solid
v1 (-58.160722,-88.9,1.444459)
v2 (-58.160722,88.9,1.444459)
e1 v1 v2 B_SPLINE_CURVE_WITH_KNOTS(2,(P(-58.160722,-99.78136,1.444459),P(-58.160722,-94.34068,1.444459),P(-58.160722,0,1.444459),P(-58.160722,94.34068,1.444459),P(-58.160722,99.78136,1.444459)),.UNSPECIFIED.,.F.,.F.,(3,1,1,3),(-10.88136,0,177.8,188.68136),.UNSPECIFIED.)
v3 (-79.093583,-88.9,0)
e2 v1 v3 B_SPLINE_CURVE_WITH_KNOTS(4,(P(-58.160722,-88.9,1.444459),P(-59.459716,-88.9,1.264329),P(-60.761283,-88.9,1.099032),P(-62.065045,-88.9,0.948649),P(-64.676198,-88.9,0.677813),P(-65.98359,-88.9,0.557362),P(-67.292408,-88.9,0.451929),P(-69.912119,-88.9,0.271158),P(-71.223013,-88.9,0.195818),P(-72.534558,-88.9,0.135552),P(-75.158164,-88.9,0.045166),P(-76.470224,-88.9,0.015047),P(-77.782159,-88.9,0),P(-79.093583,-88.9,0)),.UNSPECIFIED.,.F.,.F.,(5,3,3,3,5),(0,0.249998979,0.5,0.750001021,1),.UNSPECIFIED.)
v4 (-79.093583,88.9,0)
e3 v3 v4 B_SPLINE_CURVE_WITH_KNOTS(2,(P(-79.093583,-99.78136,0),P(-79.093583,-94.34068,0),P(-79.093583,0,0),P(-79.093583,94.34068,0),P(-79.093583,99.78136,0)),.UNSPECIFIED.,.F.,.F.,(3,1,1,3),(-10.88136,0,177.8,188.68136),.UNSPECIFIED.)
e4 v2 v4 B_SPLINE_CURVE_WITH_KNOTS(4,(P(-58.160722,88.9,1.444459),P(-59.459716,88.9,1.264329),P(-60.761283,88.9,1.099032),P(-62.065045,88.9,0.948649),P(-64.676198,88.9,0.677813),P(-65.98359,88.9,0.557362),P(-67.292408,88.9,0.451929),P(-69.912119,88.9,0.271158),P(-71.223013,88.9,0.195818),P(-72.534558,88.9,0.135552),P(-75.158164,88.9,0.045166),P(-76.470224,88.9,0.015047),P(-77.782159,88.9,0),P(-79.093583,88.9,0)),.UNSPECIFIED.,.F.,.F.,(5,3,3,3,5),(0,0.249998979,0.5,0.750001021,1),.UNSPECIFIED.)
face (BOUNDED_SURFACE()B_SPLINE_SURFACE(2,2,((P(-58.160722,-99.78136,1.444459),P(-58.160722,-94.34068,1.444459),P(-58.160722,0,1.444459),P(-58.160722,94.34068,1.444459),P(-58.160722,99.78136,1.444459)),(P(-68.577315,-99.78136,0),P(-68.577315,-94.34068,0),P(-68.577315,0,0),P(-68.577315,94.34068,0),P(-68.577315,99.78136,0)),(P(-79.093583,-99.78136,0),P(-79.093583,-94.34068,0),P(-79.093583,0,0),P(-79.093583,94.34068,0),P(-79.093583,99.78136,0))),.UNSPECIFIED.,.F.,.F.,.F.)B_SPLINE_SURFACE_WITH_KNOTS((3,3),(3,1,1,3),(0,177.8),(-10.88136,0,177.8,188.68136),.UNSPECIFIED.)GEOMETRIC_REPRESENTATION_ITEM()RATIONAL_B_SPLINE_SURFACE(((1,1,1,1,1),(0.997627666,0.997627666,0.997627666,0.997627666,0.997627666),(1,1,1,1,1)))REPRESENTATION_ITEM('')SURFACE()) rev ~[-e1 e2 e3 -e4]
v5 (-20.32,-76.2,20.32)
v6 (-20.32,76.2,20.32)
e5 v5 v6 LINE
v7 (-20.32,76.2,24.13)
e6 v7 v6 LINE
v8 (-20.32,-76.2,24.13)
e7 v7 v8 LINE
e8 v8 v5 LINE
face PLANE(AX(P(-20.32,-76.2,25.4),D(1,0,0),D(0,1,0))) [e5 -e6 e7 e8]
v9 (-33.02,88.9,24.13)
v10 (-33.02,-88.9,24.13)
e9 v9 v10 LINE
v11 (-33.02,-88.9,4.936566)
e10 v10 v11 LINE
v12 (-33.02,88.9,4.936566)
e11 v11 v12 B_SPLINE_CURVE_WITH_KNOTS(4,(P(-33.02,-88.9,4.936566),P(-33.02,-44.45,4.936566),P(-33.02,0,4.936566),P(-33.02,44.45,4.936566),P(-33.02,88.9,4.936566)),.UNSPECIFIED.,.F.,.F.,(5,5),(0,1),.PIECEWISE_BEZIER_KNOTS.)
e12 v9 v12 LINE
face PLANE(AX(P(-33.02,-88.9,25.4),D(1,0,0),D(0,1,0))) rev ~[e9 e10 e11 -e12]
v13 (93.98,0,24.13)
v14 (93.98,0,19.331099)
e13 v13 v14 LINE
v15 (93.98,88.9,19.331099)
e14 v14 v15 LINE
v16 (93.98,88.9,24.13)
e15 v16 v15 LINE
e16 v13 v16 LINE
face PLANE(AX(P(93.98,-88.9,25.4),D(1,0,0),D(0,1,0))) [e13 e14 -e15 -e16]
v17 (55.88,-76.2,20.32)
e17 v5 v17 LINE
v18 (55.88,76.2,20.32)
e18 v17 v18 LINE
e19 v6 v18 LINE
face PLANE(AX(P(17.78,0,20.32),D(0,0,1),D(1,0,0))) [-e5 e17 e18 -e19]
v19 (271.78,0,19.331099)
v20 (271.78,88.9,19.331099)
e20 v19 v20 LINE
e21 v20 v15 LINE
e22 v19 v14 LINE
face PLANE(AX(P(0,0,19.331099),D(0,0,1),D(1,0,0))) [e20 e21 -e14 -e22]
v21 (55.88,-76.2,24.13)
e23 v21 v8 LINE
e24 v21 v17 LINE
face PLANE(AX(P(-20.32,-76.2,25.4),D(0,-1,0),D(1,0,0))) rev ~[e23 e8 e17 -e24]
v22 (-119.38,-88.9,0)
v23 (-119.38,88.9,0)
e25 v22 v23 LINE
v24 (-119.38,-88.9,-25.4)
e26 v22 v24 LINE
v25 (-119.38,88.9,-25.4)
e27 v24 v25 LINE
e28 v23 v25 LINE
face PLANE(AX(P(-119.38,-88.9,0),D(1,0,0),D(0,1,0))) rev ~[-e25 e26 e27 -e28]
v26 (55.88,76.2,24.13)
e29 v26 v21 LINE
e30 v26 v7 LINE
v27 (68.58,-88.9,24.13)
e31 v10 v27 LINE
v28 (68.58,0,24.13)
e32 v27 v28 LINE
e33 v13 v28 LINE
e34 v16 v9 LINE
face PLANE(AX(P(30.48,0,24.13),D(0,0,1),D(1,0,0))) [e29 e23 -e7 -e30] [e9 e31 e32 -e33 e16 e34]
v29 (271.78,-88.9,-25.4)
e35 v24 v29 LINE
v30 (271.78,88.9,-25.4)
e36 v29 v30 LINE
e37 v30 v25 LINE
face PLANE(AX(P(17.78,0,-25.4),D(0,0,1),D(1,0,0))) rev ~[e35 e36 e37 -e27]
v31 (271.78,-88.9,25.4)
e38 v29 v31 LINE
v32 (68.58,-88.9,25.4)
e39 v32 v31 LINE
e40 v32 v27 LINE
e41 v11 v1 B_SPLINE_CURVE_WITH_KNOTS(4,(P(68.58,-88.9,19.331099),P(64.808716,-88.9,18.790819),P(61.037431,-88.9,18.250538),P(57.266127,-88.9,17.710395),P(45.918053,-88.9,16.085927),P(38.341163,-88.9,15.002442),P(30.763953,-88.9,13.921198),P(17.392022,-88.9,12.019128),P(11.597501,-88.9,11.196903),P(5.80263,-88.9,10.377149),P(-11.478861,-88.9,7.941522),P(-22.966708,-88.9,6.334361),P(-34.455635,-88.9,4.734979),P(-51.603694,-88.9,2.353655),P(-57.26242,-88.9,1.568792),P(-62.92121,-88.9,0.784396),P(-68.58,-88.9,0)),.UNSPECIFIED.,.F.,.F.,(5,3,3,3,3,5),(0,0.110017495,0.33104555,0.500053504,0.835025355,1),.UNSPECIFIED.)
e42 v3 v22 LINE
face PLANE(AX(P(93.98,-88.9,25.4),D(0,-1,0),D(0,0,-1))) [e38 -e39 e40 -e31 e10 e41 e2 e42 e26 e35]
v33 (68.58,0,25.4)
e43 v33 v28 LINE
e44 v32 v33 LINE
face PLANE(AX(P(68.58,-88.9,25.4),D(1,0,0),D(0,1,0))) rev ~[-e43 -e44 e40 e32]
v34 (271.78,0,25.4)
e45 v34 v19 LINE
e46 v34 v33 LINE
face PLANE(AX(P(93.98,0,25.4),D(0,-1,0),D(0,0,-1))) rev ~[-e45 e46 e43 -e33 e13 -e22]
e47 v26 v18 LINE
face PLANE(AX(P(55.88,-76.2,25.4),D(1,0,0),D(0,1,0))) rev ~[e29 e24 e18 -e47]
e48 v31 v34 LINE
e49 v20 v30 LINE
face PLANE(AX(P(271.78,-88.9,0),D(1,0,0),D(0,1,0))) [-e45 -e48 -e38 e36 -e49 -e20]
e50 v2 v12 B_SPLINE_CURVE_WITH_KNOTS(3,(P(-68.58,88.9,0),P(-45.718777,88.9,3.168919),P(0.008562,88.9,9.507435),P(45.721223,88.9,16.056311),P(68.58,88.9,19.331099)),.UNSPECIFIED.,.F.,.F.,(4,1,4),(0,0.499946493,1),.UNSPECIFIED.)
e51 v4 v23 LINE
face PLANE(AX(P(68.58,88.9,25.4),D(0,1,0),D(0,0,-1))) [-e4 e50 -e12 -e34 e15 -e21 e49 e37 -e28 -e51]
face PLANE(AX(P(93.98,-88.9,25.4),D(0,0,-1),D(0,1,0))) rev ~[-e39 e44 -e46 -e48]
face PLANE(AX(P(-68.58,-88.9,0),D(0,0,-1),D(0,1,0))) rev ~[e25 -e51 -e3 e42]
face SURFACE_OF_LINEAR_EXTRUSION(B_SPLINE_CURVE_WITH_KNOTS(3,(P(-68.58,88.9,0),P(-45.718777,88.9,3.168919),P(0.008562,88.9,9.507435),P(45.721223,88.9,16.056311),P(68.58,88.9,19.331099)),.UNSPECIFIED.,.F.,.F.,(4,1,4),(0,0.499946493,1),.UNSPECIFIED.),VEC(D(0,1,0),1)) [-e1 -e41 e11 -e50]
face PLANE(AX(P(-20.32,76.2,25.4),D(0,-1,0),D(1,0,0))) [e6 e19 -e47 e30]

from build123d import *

# Parameters (mm, degrees)
F0_W          = 137.16
F0_H          = 177.8
F1_DEPTH      = 25.4
F3_DEPTH      = 177.801
F4_DEPTH      = 25.4
F5_DEPTH      = 203.2
F7_DEPTH      = 177.801
F8_W          = 88.9
F8_H          = 6.0689005345
F9_DEPTH      = 203.2010001
F10_T4_DEPTH  = 183.39269854
F10_T11_DEPTH = 88.9
F10_T16_DEPTH = 88.9
F11_DEPTH     = 50.8
F12_R         = 152.4
F13_W         = 101.6
F13_H         = 177.8
F14_DEPTH     = 50.8
F15_W         = 76.2
F15_H         = 152.4
F16_DEPTH     = 5.08
F17_DEPTH     = 25.4
F19_DEPTH     = 1.27
F20_DEPTH     = 25.4


# Not quite as in the source:
# - a fillet or chamfer that OpenCascade refuses, or shapes differently, is made with other operations: its cross-section is extruded or revolved along the edge and cut away or added


with BuildPart() as f1:
    # F0 (on Top) → F1 (new body)
    with BuildSketch(Plane.XY):
        Rectangle(F0_W, F0_H)
    extrude(amount=F1_DEPTH)

    # F2 (on face) → F3 (cut, through all)
    with BuildSketch(Plane.XZ.offset(88.9)):
        Polygon((-97.1020311117, 25.4), (-68.58, 0), (68.58, 25.4), (26.2377727777, 59.2203438282), align=None)
    extrude(amount=-F3_DEPTH, mode=Mode.SUBTRACT)

    # F4 (add): a face of the model
    f4_faces = [f1.faces().sort_by_distance(p)[0] for p in [
        (0, 0, 0),
    ]]
    extrude(f4_faces, amount=F4_DEPTH)

    # F5 (add): a face of the model
    f5_faces = [f1.faces().sort_by_distance(p)[0] for p in [
        (68.58, 0, 0),
    ]]
    extrude(f5_faces, amount=F5_DEPTH)

    # F6 (on face) → F7 (cut, through all)
    with BuildSketch(Plane(origin=(0, 88.9, 0), x_dir=(-1, 0, 0), z_dir=(0, 1, 0))):
        with BuildLine():
            add(Edge.make_bspline(
                [(68.58, 0), (45.7187770864, 3.1689187819), (-0.0085622279, 9.5074346586), (-45.7212234372, 16.0563109217), (-68.58, 19.3310994655)],
                knots=[0, 0, 0, 0, 0.4999464928, 1, 1, 1, 1], degree=3))
            Line((68.58, 0), (68.58, 17.6316630095))
            Line((68.58, 17.6316630095), (-68.58, 25.4))
            add(Edge.make_bspline(
                [(-68.58, 19.3310994655), (-68.58, 21.3540663103), (-68.58, 23.3770331552), (-68.58, 25.4)],
                knots=[0, 0, 0, 0, 6.0689005345, 6.0689005345, 6.0689005345, 6.0689005345], degree=3))
        make_face()
    extrude(amount=-F7_DEPTH, mode=Mode.SUBTRACT)

    # F8 (on face) → F9 (cut, through all)
    with BuildSketch(Plane(origin=(68.58, 0, 0), x_dir=(0, -1, 0), z_dir=(-1, 0, 0))):
        with Locations((-44.45, 22.3655497327)):
            Rectangle(F8_W, F8_H)
    extrude(amount=-F9_DEPTH, mode=Mode.SUBTRACT)

    # F10: fillet of radius 127 on 2 edges, made by hand


with BuildPart() as f10_tool2:
    # F10_s3 → F10_t4 (new body)
    with BuildSketch(Plane.XZ.offset(-94.49269854)):
        with BuildLine():
            ThreePointArc((31.1637123625, 13.9794051724), (50.3142381771, 18.2403654673), (68.58, 25.4))
            Line((68.58, 25.4), (69.6868281979, 23.1138391701))
            ThreePointArc((69.6868281979, 23.1138391701), (71.12, 22.3655497327), (71.12, 19.3310994655))
            Line((71.12, 19.3310994655), (68.9402072085, 16.8167703767))
            ThreePointArc((68.9402072085, 16.8167703767), (50.2320909574, 14.1376913402), (31.5222148076, 11.4648324459))
            Line((31.5222148076, 11.4648324459), (31.1637123625, 13.9794051724))
        make_face()
    extrude(amount=F10_T4_DEPTH)

    split(bisect_by=Plane.XZ.offset(-88.9), keep=Keep.TOP)

    split(bisect_by=Plane.XY.offset(19.3310994655), keep=Keep.BOTTOM)

    split(bisect_by=Plane.XZ, keep=Keep.BOTTOM)


with BuildPart() as f1_1:
    add(f1.part)

    # F10_t1: union F10_tool2
    add(f10_tool2.part)


with BuildPart() as f10_tool9:
    # F10_s10 → F10_t11 (new body)
    with BuildSketch(Plane.XZ):
        with BuildLine():
            ThreePointArc((31.1637123625, 13.9794051724), (50.3142381771, 18.2403654673), (68.58, 25.4))
            Line((68.58, 25.4), (69.6868281979, 23.1138391701))
            ThreePointArc((69.6868281979, 23.1138391701), (71.12, 22.3655497327), (71.12, 19.3310994655))
            Line((71.12, 19.3310994655), (68.9402072085, 16.8167703767))
            ThreePointArc((68.9402072085, 16.8167703767), (50.2320909574, 14.1376913402), (31.5222148076, 11.4648324459))
            Line((31.5222148076, 11.4648324459), (31.1637123625, 13.9794051724))
        make_face()
    extrude(amount=F10_T11_DEPTH)

    split(bisect_by=Plane.XY.offset(19.3310994655), keep=Keep.BOTTOM)


with BuildPart() as f1_2:
    add(f1_1.part)

    # F10_t8: union F10_tool9
    add(f10_tool9.part)


with BuildPart() as f10_tool14:
    # F10_s15 → F10_t16 (new body)
    with BuildSketch(Plane.XZ):
        with BuildLine():
            ThreePointArc((31.1637123625, 13.9794051724), (50.3142381771, 18.2403654673), (68.58, 25.4))
            Line((68.58, 25.4), (69.6868281979, 23.1138391701))
            ThreePointArc((69.6868281979, 23.1138391701), (71.12, 22.3655497327), (71.12, 19.3310994655))
            Line((71.12, 19.3310994655), (68.9402072085, 16.8167703767))
            ThreePointArc((68.9402072085, 16.8167703767), (50.2320909574, 14.1376913402), (31.5222148076, 11.4648324459))
            Line((31.5222148076, 11.4648324459), (31.1637123625, 13.9794051724))
        make_face()
    extrude(amount=F10_T16_DEPTH)

    split(bisect_by=Plane.XY.offset(19.3310994655), keep=Keep.TOP)


with BuildPart() as f1_3:
    add(f1_2.part)

    # F10_t13: union F10_tool14
    add(f10_tool14.part)

    # F11 (add): a face of the model
    f11_faces = [f1_3.faces().sort_by_distance(p)[0] for p in [
        (-68.58, 0, -12.7),
    ]]
    extrude(f11_faces, amount=F11_DEPTH)

    # F12
    f12_edges = [f1_3.edges().sort_by_distance(p)[0] for p in [
        (-68.58, 0, 0),
    ]]
    fillet(f12_edges, radius=F12_R)

    # F13 (on face) → F14 (join)
    with BuildSketch(Plane.XY.offset(25.4)):
        with Locations((17.78, 0)):
            Rectangle(F13_W, F13_H)
    extrude(amount=-F14_DEPTH)

    # F15 (on face) → F16 (cut)
    with BuildSketch(Plane.XY.offset(25.4)):
        with Locations((17.78, 0)):
            Rectangle(F15_W, F15_H)
    extrude(amount=-F16_DEPTH, mode=Mode.SUBTRACT)

    # F17 (add): a face of the model
    f17_faces = [f1_3.faces().sort_by_distance(p)[0] for p in [
        (68.58, 44.45, 22.3655497327),
    ]]
    extrude(f17_faces, amount=F17_DEPTH)

    # F18 (on face) → F19 (cut)
    with BuildSketch(Plane.XY.offset(25.4)):
        Polygon((93.98, -88.9), (93.98, 0), (93.98, 88.9), (-33.02, 88.9), (-33.02, -88.9), align=None)
    extrude(amount=-F19_DEPTH, mode=Mode.SUBTRACT)

    # F20 (add): a face of the model
    f20_faces = [f1_3.faces().sort_by_distance(p)[0] for p in [
        (93.98, -44.45, 24.765),
    ]]
    extrude(f20_faces, amount=F20_DEPTH)


solid = f1_3.part
